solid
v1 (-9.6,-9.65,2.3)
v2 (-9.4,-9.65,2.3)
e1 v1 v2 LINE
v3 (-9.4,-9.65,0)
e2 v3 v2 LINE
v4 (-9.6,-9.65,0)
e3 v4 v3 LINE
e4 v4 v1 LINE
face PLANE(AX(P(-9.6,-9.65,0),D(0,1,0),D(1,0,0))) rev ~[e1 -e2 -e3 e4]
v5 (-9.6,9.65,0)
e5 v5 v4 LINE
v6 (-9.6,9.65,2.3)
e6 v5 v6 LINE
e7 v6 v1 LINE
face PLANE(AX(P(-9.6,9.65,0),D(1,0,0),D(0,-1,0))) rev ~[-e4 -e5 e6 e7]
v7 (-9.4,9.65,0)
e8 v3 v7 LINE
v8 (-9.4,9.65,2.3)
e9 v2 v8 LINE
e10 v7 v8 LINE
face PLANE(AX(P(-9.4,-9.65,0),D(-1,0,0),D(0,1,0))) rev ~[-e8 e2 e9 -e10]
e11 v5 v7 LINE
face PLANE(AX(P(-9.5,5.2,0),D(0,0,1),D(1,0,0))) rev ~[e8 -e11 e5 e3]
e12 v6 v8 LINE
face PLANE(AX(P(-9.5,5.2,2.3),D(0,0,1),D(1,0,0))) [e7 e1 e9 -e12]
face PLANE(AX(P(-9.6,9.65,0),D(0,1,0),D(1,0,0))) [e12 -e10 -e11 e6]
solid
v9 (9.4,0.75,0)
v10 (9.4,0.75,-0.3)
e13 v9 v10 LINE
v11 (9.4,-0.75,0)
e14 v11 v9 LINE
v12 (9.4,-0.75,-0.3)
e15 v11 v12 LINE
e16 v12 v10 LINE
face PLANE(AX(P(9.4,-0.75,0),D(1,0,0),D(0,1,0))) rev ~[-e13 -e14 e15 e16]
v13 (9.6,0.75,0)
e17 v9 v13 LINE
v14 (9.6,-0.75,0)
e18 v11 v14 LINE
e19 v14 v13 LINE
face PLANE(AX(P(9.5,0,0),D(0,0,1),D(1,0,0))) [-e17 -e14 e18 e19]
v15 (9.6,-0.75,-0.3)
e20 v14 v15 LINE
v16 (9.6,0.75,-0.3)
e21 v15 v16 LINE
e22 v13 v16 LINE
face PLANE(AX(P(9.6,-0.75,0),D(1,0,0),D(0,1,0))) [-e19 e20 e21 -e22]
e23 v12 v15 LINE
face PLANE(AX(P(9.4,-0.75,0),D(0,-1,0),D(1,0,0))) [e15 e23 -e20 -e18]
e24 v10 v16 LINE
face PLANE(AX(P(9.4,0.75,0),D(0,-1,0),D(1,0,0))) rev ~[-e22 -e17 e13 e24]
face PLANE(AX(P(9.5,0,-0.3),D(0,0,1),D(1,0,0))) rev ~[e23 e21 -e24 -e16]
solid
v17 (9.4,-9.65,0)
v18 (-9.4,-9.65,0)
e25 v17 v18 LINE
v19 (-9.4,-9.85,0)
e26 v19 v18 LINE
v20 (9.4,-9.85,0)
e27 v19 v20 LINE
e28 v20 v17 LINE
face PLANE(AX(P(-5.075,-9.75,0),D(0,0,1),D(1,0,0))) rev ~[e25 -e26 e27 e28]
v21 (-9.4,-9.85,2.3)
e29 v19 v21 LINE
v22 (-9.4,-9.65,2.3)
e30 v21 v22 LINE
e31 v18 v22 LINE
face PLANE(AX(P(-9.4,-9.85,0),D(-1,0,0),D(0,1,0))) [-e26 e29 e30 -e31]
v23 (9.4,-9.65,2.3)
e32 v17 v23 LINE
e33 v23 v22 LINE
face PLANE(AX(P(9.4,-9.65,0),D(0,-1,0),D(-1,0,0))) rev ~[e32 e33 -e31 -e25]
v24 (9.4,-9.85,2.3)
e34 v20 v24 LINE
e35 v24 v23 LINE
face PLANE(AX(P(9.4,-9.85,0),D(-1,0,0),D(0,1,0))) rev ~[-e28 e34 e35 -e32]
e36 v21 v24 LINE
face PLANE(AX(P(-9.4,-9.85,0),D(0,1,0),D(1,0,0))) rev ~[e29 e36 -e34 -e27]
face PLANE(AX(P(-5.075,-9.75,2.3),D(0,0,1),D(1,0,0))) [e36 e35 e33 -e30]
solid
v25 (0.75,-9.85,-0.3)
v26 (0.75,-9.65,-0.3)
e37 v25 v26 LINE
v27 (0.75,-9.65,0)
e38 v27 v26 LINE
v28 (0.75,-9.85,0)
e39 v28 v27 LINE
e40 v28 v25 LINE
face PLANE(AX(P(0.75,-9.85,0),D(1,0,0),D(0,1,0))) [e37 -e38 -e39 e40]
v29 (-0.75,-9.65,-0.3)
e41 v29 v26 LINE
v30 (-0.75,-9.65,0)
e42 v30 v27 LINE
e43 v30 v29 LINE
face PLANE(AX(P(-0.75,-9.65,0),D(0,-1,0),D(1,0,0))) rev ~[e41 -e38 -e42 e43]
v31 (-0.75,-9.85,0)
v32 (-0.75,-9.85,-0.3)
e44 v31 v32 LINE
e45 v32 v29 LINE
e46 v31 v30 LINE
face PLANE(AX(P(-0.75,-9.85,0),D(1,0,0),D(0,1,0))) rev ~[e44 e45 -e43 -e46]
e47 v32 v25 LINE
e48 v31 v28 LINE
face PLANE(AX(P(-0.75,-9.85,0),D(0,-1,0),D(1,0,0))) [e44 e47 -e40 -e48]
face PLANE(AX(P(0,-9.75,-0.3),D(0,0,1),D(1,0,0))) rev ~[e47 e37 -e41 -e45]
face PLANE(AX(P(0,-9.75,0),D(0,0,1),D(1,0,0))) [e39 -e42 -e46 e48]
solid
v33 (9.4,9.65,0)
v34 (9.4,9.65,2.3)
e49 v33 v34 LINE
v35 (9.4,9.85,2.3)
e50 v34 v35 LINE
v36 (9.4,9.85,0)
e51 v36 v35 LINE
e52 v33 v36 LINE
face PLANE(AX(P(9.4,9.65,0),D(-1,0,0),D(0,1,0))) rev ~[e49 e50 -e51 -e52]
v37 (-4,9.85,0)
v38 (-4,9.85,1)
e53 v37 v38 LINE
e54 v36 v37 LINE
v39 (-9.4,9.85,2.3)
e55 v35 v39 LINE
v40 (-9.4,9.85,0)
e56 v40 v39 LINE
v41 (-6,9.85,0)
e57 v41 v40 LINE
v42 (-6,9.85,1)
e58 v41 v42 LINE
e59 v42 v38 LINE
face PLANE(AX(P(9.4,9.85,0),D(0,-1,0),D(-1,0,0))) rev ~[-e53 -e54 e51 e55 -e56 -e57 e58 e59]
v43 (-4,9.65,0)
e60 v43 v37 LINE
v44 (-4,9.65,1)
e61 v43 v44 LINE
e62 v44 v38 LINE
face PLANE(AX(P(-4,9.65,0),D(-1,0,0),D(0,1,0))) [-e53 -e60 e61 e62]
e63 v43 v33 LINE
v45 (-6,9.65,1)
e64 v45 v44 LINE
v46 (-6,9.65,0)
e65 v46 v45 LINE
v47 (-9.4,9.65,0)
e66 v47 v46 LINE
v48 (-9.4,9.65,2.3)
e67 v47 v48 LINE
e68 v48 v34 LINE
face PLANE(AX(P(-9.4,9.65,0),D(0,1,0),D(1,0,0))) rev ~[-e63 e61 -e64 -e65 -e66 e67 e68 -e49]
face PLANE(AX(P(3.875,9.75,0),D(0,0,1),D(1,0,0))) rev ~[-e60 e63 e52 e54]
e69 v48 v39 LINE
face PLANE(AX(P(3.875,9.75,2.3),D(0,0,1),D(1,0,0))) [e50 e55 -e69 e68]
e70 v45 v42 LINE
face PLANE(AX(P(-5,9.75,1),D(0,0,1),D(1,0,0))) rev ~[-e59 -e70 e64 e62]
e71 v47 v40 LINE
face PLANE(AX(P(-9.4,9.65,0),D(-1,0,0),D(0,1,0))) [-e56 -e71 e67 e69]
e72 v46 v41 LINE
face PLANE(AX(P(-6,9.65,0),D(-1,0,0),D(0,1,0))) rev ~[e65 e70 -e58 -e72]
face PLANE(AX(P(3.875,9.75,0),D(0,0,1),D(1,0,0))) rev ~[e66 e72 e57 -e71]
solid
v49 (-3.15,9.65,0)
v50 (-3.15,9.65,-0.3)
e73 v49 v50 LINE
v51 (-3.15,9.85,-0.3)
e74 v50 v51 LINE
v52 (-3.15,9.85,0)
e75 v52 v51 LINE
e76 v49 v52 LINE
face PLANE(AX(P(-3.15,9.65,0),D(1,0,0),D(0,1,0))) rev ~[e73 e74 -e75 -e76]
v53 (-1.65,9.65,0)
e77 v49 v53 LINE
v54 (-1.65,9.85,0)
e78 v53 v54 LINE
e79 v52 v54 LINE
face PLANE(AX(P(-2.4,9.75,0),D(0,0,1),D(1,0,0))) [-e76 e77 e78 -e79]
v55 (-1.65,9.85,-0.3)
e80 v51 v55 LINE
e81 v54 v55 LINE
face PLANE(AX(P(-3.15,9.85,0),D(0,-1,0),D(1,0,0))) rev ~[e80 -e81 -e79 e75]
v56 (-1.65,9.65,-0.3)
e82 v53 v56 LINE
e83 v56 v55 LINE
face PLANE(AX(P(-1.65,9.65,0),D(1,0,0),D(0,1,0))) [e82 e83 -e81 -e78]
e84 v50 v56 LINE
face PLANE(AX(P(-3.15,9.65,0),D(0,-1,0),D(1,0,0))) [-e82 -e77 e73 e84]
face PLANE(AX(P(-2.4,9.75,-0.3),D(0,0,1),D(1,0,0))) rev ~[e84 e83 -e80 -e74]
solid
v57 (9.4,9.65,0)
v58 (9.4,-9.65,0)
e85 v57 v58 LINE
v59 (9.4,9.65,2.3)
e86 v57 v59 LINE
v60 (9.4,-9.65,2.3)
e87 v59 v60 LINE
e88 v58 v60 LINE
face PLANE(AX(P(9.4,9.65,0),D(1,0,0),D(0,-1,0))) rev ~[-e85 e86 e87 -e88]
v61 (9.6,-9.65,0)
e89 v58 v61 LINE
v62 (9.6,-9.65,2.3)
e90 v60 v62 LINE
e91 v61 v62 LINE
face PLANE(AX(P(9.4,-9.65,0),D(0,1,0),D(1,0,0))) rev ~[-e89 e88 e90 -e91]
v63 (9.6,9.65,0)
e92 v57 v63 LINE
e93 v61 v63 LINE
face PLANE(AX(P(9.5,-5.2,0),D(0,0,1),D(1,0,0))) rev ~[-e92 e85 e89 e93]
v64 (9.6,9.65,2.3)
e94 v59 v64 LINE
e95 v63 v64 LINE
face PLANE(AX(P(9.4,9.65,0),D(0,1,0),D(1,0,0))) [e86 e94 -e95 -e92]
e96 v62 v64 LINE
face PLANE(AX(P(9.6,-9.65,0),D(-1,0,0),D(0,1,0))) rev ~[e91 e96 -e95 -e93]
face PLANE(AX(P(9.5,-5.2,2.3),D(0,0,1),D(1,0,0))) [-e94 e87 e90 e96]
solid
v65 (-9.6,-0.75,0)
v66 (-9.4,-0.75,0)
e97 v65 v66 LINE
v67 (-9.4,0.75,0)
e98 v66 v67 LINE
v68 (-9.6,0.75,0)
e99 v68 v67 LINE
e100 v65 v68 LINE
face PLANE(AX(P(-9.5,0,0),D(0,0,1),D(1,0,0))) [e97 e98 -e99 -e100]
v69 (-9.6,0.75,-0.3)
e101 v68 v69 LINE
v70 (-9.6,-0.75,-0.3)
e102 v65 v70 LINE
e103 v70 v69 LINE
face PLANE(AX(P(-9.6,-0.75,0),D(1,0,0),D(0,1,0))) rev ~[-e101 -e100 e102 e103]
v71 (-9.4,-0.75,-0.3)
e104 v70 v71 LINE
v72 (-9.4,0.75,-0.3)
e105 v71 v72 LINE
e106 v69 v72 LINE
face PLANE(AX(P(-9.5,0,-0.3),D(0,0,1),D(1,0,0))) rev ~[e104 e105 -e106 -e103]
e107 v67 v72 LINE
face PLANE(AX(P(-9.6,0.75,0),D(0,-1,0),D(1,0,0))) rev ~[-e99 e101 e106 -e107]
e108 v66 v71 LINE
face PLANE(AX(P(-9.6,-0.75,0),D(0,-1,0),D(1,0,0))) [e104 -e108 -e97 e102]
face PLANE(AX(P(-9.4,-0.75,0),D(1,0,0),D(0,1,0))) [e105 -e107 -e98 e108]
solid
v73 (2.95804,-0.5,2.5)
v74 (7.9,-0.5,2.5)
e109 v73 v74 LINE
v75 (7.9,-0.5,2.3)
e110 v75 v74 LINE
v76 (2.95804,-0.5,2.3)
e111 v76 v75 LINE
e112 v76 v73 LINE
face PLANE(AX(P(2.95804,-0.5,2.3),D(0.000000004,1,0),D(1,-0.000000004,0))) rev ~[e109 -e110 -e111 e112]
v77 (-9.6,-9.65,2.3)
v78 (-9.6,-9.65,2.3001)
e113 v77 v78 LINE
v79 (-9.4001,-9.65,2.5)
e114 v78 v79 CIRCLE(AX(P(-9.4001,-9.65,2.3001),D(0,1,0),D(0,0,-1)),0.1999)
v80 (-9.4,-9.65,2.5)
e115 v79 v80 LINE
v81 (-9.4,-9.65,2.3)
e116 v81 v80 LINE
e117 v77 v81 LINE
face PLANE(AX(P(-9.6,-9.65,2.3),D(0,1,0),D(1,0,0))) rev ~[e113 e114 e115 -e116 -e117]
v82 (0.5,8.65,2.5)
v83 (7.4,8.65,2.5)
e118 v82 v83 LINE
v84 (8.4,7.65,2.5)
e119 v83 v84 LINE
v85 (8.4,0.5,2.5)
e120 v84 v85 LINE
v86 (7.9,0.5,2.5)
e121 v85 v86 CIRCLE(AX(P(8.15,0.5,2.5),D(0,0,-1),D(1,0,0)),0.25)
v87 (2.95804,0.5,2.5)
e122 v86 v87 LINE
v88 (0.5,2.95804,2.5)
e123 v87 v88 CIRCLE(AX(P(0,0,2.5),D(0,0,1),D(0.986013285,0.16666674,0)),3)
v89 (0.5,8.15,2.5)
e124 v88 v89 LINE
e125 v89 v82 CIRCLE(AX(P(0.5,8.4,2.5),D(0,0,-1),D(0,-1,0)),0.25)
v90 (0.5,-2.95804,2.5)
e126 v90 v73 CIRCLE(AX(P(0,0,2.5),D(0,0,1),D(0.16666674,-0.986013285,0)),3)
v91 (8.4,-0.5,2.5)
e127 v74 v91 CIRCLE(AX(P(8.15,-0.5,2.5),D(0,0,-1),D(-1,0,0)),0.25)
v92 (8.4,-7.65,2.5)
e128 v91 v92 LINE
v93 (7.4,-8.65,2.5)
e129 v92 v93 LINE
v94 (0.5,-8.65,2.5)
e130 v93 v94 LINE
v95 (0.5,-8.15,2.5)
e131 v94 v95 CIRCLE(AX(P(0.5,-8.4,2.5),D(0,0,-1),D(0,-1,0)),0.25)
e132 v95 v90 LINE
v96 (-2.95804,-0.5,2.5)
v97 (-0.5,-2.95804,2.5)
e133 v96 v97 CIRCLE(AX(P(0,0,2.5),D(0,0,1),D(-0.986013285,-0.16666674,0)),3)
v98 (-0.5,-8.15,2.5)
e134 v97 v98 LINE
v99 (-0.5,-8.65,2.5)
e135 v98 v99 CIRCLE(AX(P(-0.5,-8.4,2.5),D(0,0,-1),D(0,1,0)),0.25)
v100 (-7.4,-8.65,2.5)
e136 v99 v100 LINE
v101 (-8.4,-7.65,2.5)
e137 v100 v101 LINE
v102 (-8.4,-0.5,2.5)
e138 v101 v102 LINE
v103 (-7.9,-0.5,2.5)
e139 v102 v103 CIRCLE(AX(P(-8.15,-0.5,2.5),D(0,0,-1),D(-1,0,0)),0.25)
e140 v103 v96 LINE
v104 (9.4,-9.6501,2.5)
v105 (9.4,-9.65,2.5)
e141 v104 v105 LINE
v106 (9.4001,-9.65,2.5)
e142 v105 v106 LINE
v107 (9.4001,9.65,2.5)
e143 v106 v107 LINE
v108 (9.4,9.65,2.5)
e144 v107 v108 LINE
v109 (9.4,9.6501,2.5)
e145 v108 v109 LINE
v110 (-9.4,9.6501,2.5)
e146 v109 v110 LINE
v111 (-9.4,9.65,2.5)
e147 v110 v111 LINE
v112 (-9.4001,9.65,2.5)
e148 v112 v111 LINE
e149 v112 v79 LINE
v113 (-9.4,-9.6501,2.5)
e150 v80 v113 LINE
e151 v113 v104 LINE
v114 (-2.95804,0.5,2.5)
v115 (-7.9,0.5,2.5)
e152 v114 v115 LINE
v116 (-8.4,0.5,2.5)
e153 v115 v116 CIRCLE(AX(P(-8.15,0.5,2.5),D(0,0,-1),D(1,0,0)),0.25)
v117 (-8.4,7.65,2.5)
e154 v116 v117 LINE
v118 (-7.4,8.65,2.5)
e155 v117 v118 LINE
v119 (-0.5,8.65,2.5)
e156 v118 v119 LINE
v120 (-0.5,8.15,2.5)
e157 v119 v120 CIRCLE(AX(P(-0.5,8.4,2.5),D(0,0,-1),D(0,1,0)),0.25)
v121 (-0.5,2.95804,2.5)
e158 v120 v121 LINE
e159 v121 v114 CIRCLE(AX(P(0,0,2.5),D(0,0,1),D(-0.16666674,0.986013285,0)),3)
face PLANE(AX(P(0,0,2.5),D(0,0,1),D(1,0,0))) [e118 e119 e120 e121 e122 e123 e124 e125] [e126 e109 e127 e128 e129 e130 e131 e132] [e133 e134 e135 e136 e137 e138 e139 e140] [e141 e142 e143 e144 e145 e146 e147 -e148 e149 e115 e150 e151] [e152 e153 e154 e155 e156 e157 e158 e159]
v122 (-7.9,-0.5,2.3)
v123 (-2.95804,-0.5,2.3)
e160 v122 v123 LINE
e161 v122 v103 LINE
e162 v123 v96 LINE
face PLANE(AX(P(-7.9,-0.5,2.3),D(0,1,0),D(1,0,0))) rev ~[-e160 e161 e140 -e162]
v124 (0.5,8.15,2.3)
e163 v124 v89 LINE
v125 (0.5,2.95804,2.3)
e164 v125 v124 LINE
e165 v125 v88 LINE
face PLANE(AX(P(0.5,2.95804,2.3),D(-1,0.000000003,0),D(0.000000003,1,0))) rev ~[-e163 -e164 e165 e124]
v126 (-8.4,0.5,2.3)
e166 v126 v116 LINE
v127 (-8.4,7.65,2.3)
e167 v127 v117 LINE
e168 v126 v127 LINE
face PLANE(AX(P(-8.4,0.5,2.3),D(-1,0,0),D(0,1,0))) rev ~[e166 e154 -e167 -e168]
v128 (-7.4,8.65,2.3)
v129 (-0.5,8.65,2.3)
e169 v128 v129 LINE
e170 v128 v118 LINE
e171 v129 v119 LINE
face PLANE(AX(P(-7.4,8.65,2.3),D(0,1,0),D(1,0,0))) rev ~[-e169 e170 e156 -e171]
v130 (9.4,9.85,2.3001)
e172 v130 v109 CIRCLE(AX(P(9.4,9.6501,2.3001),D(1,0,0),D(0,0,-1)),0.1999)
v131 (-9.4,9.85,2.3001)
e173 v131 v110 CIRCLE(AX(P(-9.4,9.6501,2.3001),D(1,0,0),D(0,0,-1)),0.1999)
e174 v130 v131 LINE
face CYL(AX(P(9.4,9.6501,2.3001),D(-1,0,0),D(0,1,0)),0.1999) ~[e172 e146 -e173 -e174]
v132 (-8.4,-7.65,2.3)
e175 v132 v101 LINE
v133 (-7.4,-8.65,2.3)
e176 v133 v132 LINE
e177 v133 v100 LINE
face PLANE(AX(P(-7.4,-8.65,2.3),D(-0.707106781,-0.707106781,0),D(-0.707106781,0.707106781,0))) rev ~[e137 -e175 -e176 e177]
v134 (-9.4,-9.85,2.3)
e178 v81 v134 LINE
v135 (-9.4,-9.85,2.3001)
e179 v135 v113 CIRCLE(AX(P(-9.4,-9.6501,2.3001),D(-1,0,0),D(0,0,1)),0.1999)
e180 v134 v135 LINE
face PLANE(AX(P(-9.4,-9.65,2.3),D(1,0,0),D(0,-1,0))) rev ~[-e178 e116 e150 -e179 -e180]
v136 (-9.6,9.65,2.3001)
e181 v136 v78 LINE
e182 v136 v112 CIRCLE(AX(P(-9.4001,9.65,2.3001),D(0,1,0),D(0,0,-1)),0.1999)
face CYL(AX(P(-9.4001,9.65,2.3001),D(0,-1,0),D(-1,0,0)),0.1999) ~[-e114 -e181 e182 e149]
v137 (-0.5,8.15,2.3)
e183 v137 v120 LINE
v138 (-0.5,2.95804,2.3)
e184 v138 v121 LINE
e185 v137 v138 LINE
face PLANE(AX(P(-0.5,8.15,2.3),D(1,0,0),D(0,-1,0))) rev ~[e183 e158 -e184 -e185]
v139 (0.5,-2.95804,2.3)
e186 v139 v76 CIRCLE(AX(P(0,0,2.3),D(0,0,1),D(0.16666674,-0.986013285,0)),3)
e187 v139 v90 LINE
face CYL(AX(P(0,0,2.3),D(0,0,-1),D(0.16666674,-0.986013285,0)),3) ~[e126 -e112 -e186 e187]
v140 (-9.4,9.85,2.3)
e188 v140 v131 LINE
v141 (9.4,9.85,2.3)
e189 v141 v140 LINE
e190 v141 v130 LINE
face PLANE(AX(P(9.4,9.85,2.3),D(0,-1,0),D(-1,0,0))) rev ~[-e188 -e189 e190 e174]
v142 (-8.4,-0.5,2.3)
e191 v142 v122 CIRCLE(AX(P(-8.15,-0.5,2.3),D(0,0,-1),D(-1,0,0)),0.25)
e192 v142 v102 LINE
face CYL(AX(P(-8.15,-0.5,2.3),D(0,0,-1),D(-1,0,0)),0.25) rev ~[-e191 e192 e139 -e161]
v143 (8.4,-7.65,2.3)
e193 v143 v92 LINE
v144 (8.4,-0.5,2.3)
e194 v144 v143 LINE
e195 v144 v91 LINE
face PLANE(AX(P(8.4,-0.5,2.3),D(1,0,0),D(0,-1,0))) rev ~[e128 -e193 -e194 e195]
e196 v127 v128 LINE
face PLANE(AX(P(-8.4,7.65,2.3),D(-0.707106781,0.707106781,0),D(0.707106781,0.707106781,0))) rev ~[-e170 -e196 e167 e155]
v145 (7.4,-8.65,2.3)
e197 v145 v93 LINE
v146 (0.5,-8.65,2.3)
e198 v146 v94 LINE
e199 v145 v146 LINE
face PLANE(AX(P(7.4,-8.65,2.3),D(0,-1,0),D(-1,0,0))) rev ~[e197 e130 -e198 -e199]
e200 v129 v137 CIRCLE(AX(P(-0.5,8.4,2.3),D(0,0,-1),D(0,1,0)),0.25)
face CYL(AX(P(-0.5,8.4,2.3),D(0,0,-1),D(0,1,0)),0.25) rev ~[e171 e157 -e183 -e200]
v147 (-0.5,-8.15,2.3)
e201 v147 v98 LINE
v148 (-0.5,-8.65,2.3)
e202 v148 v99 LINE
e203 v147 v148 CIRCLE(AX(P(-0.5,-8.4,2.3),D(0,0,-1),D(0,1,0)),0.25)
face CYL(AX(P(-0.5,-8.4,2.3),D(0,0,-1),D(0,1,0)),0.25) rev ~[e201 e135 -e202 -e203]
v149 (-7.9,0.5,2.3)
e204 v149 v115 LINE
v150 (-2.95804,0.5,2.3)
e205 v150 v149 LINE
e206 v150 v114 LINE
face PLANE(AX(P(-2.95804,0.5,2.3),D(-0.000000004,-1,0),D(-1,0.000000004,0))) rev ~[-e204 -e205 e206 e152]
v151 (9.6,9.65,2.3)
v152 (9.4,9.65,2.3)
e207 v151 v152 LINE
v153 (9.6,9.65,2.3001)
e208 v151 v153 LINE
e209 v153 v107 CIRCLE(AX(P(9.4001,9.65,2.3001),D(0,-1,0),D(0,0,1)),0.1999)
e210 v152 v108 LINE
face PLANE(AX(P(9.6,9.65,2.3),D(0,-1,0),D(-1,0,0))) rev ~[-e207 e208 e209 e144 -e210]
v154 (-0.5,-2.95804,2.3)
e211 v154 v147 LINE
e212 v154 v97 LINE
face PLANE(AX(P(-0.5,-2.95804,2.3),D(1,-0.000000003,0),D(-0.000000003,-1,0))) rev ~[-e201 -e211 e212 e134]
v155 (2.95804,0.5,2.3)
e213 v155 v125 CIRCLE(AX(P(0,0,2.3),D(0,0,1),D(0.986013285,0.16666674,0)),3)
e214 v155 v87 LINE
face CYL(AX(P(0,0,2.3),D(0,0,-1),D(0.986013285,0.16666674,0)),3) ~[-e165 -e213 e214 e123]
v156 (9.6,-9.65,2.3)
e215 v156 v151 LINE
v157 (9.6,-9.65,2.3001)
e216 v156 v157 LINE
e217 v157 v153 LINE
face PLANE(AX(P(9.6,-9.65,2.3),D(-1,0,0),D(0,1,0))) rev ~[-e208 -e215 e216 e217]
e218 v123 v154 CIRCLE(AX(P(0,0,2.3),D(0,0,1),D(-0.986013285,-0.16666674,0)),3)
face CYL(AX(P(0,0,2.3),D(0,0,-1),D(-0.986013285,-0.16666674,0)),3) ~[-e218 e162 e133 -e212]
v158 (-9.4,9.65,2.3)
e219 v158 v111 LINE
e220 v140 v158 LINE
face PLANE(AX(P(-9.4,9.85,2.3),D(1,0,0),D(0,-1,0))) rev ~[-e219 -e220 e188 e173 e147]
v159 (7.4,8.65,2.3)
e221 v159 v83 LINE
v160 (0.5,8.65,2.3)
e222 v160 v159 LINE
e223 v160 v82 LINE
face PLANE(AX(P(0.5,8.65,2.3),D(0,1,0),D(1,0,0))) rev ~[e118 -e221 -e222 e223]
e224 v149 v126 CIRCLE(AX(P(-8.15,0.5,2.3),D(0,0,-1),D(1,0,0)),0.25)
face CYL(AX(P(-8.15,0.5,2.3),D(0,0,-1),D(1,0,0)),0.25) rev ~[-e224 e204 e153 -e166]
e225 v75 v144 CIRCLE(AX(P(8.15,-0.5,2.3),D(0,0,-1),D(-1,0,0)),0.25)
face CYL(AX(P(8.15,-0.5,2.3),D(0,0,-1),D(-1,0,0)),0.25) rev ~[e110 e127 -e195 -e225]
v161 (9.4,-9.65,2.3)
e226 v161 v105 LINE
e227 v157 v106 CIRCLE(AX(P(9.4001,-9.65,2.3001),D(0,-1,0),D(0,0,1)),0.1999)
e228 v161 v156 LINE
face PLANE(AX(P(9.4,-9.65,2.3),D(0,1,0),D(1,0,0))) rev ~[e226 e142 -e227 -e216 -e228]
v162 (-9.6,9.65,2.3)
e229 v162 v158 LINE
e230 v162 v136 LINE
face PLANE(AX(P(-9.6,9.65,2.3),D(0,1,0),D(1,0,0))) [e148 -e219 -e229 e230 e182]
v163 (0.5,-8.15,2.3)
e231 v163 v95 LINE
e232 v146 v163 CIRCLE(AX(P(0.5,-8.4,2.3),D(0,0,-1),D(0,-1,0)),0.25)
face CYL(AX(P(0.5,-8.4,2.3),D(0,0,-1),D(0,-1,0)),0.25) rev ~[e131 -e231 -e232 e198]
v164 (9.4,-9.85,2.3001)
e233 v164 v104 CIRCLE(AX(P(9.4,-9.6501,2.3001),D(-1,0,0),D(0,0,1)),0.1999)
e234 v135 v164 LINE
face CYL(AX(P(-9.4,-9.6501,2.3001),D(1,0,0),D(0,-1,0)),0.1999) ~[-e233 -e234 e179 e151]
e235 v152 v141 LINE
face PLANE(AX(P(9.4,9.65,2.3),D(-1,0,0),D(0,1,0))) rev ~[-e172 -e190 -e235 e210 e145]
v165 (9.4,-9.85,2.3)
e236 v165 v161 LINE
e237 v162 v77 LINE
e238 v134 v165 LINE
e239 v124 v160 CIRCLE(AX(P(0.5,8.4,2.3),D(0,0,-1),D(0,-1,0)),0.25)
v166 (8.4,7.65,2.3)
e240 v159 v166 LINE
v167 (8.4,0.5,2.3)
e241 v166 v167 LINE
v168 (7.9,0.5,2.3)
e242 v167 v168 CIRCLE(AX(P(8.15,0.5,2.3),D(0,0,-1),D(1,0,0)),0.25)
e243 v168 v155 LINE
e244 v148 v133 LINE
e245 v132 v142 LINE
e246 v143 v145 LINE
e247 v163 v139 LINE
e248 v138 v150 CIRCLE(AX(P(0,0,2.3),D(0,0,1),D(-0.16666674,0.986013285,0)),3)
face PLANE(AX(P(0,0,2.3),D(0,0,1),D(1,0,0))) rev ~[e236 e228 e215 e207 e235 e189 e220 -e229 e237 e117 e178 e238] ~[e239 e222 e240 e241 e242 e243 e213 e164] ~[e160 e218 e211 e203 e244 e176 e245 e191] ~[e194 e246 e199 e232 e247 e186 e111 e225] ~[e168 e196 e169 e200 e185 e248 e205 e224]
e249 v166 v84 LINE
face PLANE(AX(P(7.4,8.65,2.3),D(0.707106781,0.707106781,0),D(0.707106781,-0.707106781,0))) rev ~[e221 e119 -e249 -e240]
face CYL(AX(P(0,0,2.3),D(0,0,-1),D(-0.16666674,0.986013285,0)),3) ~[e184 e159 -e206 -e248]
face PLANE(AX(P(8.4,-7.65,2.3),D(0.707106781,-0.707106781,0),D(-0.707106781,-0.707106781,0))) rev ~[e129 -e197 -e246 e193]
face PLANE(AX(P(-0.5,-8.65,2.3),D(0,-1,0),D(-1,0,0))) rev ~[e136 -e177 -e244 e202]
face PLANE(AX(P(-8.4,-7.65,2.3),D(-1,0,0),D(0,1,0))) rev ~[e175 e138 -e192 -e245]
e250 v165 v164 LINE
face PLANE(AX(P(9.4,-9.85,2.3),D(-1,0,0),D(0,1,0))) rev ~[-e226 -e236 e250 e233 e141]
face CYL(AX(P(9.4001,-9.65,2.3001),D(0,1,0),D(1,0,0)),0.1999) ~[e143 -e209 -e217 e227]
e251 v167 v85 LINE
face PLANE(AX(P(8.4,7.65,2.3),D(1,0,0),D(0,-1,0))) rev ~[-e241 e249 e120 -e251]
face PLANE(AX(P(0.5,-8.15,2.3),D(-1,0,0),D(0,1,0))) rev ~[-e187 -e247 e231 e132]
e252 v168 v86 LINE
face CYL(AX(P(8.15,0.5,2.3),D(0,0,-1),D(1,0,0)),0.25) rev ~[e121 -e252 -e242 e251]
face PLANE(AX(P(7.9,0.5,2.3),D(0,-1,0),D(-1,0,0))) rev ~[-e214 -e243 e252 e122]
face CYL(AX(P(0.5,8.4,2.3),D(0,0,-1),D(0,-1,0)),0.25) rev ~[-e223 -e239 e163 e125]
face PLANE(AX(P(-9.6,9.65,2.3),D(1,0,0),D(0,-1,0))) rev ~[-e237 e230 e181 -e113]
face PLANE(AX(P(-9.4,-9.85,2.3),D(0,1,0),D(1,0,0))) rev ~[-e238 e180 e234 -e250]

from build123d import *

# Parameters (mm, degrees)
F1_START = 2.3
F0_W     = 8.65
F0_H     = 0.2
F0_W_2   = 1.5
F0_W_3   = 0.2
F0_H_2   = 8.9
F0_H_3   = 1.5
F0_W_4   = 11.05
F0_W_5   = 0.85
F0_W_6   = 2
F0_W_7   = 3.4
F1_DEPTH = 0.2
F2_DEPTH = 2.3
F3_DEPTH = 0.3
F4_DEPTH = 1
F5_R     = 0.1999


# Not quite as in the source:
# - a fillet or chamfer is up to 0.001 mm smaller than in the source, because OpenCascade refuses the exact size
# - ends of sketch curves that miss each other by under 0.0002 mm in the source are joined


with BuildPart() as f1:
    # F0 (on Top) → F1 (new body)
    with BuildSketch(Plane.XY.offset(F1_START)):
        Polygon((-6, 9.65), (-9.4, 9.65), (-9.4, 0.75), (-9.4, -0.75), (-9.4, -9.65), (-0.75, -9.65), (0.75, -9.65), (9.4, -9.65), (9.4, -0.75), (9.4, 0.75), (9.4, 9.65), (-1.65, 9.65), (-3.15, 9.65), (-4, 9.65), align=None)
        with BuildLine():
            Line((-0.5, -8.65), (-7.4, -8.65))
            Line((-7.4, -8.65), (-8.4, -7.65))
            Line((-8.4, -7.65), (-8.4, -0.5))
            ThreePointArc((-8.4, -0.5), (-8.15, -0.25), (-7.9, -0.5))
            Line((-7.9, -0.5), (-2.95804, -0.5))
            ThreePointArc((-2.95804, -0.5), (-2.1213203436, -2.1213203436), (-0.4999999822, -2.9580398946))
            Line((-0.4999999822, -2.9580398946), (-0.5, -8.15))
            ThreePointArc((-0.5, -8.15), (-0.25, -8.4), (-0.5, -8.65))
        make_face(mode=Mode.SUBTRACT)
        with BuildLine():
            Line((8.4, -7.65), (7.4, -8.65))
            Line((7.4, -8.65), (0.5, -8.65))
            ThreePointArc((0.5, -8.65), (0.25, -8.4), (0.5, -8.15))
            Line((0.5, -8.15), (0.5, -2.95804))
            ThreePointArc((0.5, -2.95804), (2.1213203436, -2.1213203436), (2.9580398946, -0.4999999822))
            Line((2.9580398946, -0.4999999822), (7.9, -0.5))
            ThreePointArc((7.9, -0.5), (8.15, -0.25), (8.4, -0.5))
            Line((8.4, -0.5), (8.4, -7.65))
        make_face(mode=Mode.SUBTRACT)
        with BuildLine():
            Line((-8.4, 0.5), (-8.4, 7.65))
            Line((-8.4, 7.65), (-7.4, 8.65))
            Line((-7.4, 8.65), (-0.5, 8.65))
            ThreePointArc((-0.5, 8.65), (-0.25, 8.4), (-0.5, 8.15))
            Line((-0.5, 8.15), (-0.5, 2.95804))
            ThreePointArc((-0.5, 2.95804), (-2.1213203436, 2.1213203436), (-2.9580398946, 0.4999999822))
            Line((-2.9580398946, 0.4999999822), (-7.9, 0.5))
            ThreePointArc((-7.9, 0.5), (-8.15, 0.25), (-8.4, 0.5))
        make_face(mode=Mode.SUBTRACT)
        with BuildLine():
            Line((0.5, 8.65), (7.4, 8.65))
            Line((7.4, 8.65), (8.4, 7.65))
            Line((8.4, 7.65), (8.4, 0.5))
            ThreePointArc((8.4, 0.5), (8.15, 0.25), (7.9, 0.5))
            Line((7.9, 0.5), (2.95804, 0.5))
            ThreePointArc((2.95804, 0.5), (2.1213203436, 2.1213203436), (0.4999999822, 2.9580398946))
            Line((0.4999999822, 2.9580398946), (0.5, 8.15))
            ThreePointArc((0.5, 8.15), (0.25, 8.4), (0.5, 8.65))
        make_face(mode=Mode.SUBTRACT)
        with Locations((-5.075, -9.75)):
            Rectangle(F0_W, F0_H)
        with Locations((0, -9.75)):
            Rectangle(F0_W_2, F0_H)
        with Locations((5.075, -9.75)):
            Rectangle(F0_W, F0_H)
        with Locations((9.5, -5.2)):
            Rectangle(F0_W_3, F0_H_2)
        with Locations((9.5, 0)):
            Rectangle(F0_W_3, F0_H_3)
        with Locations((9.5, 5.2)):
            Rectangle(F0_W_3, F0_H_2)
        with Locations((3.875, 9.75)):
            Rectangle(F0_W_4, F0_H)
        with Locations((-2.4, 9.75)):
            Rectangle(F0_W_2, F0_H)
        with Locations((-3.575, 9.75)):
            Rectangle(F0_W_5, F0_H)
        with Locations((-5, 9.75)):
            Rectangle(F0_W_6, F0_H)
        with Locations((-7.7, 9.75)):
            Rectangle(F0_W_7, F0_H)
        with Locations((-9.5, 5.2)):
            Rectangle(F0_W_3, F0_H_2)
        with Locations((-9.5, 0)):
            Rectangle(F0_W_3, F0_H_3)
        with Locations((-9.5, -5.2)):
            Rectangle(F0_W_3, F0_H_2)
    extrude(amount=F1_DEPTH)

    # F5 (radius 0.2 in the source; OpenCascade refuses exactly that, so slightly less here)
    f5_edges = [f1.edges().sort_by_distance(p)[0] for p in [
        (0, -9.85, 2.5),
        (9.6, 0, 2.5),
        (0, 9.85, 2.5),
        (-9.6, 0, 2.5),
    ]]
    fillet(f5_edges, radius=F5_R)


with BuildPart() as f2:
    # F0 (on Top) → F2 (new body)
    with BuildSketch(Plane.XY):
        with Locations((-5.075, -9.75)):
            Rectangle(F0_W, F0_H)
        with Locations((0, -9.75)):
            Rectangle(F0_W_2, F0_H)
        with Locations((5.075, -9.75)):
            Rectangle(F0_W, F0_H)
    extrude(amount=F2_DEPTH)


with BuildPart() as f2b:
    # F0 (on Top) → F2, piece 2 (new body)
    with BuildSketch(Plane.XY):
        with Locations((9.5, -5.2)):
            Rectangle(F0_W_3, F0_H_2)
        with Locations((9.5, 0)):
            Rectangle(F0_W_3, F0_H_3)
        with Locations((9.5, 5.2)):
            Rectangle(F0_W_3, F0_H_2)
    extrude(amount=F2_DEPTH)


with BuildPart() as f2c:
    # F0 (on Top) → F2, piece 3 (new body)
    with BuildSketch(Plane.XY):
        with Locations((3.875, 9.75)):
            Rectangle(F0_W_4, F0_H)
        with Locations((-2.4, 9.75)):
            Rectangle(F0_W_2, F0_H)
        with Locations((-3.575, 9.75)):
            Rectangle(F0_W_5, F0_H)
        with Locations((-5, 9.75)):
            Rectangle(F0_W_6, F0_H)
        with Locations((-7.7, 9.75)):
            Rectangle(F0_W_7, F0_H)
    extrude(amount=F2_DEPTH)

    # F0 (on Top) → F4 (cut)
    with BuildSketch(Plane.XY):
        with Locations((-5, 9.75)):
            Rectangle(F0_W_6, F0_H)
    extrude(amount=F4_DEPTH, mode=Mode.SUBTRACT)


with BuildPart() as f2d:
    # F0 (on Top) → F2, piece 4 (new body)
    with BuildSketch(Plane.XY):
        with Locations((-9.5, 5.2)):
            Rectangle(F0_W_3, F0_H_2)
        with Locations((-9.5, 0)):
            Rectangle(F0_W_3, F0_H_3)
        with Locations((-9.5, -5.2)):
            Rectangle(F0_W_3, F0_H_2)
    extrude(amount=F2_DEPTH)


with BuildPart() as f3:
    # F0 (on Top) → F3 (new body)
    with BuildSketch(Plane.XY):
        with Locations((9.5, 0)):
            Rectangle(F0_W_3, F0_H_3)
    extrude(amount=-F3_DEPTH)


with BuildPart() as f3b:
    # F0 (on Top) → F3, piece 2 (new body)
    with BuildSketch(Plane.XY):
        with Locations((0, -9.75)):
            Rectangle(F0_W_2, F0_H)
    extrude(amount=-F3_DEPTH)


with BuildPart() as f3c:
    # F0 (on Top) → F3, piece 3 (new body)
    with BuildSketch(Plane.XY):
        with Locations((-9.5, 0)):
            Rectangle(F0_W_3, F0_H_3)
    extrude(amount=-F3_DEPTH)


with BuildPart() as f3d:
    # F0 (on Top) → F3, piece 4 (new body)
    with BuildSketch(Plane.XY):
        with Locations((-2.4, 9.75)):
            Rectangle(F0_W_2, F0_H)
    extrude(amount=-F3_DEPTH)


solid = Compound([f1.part, f2.part, f2b.part, f2c.part, f2d.part, f3.part, f3b.part, f3c.part, f3d.part])
